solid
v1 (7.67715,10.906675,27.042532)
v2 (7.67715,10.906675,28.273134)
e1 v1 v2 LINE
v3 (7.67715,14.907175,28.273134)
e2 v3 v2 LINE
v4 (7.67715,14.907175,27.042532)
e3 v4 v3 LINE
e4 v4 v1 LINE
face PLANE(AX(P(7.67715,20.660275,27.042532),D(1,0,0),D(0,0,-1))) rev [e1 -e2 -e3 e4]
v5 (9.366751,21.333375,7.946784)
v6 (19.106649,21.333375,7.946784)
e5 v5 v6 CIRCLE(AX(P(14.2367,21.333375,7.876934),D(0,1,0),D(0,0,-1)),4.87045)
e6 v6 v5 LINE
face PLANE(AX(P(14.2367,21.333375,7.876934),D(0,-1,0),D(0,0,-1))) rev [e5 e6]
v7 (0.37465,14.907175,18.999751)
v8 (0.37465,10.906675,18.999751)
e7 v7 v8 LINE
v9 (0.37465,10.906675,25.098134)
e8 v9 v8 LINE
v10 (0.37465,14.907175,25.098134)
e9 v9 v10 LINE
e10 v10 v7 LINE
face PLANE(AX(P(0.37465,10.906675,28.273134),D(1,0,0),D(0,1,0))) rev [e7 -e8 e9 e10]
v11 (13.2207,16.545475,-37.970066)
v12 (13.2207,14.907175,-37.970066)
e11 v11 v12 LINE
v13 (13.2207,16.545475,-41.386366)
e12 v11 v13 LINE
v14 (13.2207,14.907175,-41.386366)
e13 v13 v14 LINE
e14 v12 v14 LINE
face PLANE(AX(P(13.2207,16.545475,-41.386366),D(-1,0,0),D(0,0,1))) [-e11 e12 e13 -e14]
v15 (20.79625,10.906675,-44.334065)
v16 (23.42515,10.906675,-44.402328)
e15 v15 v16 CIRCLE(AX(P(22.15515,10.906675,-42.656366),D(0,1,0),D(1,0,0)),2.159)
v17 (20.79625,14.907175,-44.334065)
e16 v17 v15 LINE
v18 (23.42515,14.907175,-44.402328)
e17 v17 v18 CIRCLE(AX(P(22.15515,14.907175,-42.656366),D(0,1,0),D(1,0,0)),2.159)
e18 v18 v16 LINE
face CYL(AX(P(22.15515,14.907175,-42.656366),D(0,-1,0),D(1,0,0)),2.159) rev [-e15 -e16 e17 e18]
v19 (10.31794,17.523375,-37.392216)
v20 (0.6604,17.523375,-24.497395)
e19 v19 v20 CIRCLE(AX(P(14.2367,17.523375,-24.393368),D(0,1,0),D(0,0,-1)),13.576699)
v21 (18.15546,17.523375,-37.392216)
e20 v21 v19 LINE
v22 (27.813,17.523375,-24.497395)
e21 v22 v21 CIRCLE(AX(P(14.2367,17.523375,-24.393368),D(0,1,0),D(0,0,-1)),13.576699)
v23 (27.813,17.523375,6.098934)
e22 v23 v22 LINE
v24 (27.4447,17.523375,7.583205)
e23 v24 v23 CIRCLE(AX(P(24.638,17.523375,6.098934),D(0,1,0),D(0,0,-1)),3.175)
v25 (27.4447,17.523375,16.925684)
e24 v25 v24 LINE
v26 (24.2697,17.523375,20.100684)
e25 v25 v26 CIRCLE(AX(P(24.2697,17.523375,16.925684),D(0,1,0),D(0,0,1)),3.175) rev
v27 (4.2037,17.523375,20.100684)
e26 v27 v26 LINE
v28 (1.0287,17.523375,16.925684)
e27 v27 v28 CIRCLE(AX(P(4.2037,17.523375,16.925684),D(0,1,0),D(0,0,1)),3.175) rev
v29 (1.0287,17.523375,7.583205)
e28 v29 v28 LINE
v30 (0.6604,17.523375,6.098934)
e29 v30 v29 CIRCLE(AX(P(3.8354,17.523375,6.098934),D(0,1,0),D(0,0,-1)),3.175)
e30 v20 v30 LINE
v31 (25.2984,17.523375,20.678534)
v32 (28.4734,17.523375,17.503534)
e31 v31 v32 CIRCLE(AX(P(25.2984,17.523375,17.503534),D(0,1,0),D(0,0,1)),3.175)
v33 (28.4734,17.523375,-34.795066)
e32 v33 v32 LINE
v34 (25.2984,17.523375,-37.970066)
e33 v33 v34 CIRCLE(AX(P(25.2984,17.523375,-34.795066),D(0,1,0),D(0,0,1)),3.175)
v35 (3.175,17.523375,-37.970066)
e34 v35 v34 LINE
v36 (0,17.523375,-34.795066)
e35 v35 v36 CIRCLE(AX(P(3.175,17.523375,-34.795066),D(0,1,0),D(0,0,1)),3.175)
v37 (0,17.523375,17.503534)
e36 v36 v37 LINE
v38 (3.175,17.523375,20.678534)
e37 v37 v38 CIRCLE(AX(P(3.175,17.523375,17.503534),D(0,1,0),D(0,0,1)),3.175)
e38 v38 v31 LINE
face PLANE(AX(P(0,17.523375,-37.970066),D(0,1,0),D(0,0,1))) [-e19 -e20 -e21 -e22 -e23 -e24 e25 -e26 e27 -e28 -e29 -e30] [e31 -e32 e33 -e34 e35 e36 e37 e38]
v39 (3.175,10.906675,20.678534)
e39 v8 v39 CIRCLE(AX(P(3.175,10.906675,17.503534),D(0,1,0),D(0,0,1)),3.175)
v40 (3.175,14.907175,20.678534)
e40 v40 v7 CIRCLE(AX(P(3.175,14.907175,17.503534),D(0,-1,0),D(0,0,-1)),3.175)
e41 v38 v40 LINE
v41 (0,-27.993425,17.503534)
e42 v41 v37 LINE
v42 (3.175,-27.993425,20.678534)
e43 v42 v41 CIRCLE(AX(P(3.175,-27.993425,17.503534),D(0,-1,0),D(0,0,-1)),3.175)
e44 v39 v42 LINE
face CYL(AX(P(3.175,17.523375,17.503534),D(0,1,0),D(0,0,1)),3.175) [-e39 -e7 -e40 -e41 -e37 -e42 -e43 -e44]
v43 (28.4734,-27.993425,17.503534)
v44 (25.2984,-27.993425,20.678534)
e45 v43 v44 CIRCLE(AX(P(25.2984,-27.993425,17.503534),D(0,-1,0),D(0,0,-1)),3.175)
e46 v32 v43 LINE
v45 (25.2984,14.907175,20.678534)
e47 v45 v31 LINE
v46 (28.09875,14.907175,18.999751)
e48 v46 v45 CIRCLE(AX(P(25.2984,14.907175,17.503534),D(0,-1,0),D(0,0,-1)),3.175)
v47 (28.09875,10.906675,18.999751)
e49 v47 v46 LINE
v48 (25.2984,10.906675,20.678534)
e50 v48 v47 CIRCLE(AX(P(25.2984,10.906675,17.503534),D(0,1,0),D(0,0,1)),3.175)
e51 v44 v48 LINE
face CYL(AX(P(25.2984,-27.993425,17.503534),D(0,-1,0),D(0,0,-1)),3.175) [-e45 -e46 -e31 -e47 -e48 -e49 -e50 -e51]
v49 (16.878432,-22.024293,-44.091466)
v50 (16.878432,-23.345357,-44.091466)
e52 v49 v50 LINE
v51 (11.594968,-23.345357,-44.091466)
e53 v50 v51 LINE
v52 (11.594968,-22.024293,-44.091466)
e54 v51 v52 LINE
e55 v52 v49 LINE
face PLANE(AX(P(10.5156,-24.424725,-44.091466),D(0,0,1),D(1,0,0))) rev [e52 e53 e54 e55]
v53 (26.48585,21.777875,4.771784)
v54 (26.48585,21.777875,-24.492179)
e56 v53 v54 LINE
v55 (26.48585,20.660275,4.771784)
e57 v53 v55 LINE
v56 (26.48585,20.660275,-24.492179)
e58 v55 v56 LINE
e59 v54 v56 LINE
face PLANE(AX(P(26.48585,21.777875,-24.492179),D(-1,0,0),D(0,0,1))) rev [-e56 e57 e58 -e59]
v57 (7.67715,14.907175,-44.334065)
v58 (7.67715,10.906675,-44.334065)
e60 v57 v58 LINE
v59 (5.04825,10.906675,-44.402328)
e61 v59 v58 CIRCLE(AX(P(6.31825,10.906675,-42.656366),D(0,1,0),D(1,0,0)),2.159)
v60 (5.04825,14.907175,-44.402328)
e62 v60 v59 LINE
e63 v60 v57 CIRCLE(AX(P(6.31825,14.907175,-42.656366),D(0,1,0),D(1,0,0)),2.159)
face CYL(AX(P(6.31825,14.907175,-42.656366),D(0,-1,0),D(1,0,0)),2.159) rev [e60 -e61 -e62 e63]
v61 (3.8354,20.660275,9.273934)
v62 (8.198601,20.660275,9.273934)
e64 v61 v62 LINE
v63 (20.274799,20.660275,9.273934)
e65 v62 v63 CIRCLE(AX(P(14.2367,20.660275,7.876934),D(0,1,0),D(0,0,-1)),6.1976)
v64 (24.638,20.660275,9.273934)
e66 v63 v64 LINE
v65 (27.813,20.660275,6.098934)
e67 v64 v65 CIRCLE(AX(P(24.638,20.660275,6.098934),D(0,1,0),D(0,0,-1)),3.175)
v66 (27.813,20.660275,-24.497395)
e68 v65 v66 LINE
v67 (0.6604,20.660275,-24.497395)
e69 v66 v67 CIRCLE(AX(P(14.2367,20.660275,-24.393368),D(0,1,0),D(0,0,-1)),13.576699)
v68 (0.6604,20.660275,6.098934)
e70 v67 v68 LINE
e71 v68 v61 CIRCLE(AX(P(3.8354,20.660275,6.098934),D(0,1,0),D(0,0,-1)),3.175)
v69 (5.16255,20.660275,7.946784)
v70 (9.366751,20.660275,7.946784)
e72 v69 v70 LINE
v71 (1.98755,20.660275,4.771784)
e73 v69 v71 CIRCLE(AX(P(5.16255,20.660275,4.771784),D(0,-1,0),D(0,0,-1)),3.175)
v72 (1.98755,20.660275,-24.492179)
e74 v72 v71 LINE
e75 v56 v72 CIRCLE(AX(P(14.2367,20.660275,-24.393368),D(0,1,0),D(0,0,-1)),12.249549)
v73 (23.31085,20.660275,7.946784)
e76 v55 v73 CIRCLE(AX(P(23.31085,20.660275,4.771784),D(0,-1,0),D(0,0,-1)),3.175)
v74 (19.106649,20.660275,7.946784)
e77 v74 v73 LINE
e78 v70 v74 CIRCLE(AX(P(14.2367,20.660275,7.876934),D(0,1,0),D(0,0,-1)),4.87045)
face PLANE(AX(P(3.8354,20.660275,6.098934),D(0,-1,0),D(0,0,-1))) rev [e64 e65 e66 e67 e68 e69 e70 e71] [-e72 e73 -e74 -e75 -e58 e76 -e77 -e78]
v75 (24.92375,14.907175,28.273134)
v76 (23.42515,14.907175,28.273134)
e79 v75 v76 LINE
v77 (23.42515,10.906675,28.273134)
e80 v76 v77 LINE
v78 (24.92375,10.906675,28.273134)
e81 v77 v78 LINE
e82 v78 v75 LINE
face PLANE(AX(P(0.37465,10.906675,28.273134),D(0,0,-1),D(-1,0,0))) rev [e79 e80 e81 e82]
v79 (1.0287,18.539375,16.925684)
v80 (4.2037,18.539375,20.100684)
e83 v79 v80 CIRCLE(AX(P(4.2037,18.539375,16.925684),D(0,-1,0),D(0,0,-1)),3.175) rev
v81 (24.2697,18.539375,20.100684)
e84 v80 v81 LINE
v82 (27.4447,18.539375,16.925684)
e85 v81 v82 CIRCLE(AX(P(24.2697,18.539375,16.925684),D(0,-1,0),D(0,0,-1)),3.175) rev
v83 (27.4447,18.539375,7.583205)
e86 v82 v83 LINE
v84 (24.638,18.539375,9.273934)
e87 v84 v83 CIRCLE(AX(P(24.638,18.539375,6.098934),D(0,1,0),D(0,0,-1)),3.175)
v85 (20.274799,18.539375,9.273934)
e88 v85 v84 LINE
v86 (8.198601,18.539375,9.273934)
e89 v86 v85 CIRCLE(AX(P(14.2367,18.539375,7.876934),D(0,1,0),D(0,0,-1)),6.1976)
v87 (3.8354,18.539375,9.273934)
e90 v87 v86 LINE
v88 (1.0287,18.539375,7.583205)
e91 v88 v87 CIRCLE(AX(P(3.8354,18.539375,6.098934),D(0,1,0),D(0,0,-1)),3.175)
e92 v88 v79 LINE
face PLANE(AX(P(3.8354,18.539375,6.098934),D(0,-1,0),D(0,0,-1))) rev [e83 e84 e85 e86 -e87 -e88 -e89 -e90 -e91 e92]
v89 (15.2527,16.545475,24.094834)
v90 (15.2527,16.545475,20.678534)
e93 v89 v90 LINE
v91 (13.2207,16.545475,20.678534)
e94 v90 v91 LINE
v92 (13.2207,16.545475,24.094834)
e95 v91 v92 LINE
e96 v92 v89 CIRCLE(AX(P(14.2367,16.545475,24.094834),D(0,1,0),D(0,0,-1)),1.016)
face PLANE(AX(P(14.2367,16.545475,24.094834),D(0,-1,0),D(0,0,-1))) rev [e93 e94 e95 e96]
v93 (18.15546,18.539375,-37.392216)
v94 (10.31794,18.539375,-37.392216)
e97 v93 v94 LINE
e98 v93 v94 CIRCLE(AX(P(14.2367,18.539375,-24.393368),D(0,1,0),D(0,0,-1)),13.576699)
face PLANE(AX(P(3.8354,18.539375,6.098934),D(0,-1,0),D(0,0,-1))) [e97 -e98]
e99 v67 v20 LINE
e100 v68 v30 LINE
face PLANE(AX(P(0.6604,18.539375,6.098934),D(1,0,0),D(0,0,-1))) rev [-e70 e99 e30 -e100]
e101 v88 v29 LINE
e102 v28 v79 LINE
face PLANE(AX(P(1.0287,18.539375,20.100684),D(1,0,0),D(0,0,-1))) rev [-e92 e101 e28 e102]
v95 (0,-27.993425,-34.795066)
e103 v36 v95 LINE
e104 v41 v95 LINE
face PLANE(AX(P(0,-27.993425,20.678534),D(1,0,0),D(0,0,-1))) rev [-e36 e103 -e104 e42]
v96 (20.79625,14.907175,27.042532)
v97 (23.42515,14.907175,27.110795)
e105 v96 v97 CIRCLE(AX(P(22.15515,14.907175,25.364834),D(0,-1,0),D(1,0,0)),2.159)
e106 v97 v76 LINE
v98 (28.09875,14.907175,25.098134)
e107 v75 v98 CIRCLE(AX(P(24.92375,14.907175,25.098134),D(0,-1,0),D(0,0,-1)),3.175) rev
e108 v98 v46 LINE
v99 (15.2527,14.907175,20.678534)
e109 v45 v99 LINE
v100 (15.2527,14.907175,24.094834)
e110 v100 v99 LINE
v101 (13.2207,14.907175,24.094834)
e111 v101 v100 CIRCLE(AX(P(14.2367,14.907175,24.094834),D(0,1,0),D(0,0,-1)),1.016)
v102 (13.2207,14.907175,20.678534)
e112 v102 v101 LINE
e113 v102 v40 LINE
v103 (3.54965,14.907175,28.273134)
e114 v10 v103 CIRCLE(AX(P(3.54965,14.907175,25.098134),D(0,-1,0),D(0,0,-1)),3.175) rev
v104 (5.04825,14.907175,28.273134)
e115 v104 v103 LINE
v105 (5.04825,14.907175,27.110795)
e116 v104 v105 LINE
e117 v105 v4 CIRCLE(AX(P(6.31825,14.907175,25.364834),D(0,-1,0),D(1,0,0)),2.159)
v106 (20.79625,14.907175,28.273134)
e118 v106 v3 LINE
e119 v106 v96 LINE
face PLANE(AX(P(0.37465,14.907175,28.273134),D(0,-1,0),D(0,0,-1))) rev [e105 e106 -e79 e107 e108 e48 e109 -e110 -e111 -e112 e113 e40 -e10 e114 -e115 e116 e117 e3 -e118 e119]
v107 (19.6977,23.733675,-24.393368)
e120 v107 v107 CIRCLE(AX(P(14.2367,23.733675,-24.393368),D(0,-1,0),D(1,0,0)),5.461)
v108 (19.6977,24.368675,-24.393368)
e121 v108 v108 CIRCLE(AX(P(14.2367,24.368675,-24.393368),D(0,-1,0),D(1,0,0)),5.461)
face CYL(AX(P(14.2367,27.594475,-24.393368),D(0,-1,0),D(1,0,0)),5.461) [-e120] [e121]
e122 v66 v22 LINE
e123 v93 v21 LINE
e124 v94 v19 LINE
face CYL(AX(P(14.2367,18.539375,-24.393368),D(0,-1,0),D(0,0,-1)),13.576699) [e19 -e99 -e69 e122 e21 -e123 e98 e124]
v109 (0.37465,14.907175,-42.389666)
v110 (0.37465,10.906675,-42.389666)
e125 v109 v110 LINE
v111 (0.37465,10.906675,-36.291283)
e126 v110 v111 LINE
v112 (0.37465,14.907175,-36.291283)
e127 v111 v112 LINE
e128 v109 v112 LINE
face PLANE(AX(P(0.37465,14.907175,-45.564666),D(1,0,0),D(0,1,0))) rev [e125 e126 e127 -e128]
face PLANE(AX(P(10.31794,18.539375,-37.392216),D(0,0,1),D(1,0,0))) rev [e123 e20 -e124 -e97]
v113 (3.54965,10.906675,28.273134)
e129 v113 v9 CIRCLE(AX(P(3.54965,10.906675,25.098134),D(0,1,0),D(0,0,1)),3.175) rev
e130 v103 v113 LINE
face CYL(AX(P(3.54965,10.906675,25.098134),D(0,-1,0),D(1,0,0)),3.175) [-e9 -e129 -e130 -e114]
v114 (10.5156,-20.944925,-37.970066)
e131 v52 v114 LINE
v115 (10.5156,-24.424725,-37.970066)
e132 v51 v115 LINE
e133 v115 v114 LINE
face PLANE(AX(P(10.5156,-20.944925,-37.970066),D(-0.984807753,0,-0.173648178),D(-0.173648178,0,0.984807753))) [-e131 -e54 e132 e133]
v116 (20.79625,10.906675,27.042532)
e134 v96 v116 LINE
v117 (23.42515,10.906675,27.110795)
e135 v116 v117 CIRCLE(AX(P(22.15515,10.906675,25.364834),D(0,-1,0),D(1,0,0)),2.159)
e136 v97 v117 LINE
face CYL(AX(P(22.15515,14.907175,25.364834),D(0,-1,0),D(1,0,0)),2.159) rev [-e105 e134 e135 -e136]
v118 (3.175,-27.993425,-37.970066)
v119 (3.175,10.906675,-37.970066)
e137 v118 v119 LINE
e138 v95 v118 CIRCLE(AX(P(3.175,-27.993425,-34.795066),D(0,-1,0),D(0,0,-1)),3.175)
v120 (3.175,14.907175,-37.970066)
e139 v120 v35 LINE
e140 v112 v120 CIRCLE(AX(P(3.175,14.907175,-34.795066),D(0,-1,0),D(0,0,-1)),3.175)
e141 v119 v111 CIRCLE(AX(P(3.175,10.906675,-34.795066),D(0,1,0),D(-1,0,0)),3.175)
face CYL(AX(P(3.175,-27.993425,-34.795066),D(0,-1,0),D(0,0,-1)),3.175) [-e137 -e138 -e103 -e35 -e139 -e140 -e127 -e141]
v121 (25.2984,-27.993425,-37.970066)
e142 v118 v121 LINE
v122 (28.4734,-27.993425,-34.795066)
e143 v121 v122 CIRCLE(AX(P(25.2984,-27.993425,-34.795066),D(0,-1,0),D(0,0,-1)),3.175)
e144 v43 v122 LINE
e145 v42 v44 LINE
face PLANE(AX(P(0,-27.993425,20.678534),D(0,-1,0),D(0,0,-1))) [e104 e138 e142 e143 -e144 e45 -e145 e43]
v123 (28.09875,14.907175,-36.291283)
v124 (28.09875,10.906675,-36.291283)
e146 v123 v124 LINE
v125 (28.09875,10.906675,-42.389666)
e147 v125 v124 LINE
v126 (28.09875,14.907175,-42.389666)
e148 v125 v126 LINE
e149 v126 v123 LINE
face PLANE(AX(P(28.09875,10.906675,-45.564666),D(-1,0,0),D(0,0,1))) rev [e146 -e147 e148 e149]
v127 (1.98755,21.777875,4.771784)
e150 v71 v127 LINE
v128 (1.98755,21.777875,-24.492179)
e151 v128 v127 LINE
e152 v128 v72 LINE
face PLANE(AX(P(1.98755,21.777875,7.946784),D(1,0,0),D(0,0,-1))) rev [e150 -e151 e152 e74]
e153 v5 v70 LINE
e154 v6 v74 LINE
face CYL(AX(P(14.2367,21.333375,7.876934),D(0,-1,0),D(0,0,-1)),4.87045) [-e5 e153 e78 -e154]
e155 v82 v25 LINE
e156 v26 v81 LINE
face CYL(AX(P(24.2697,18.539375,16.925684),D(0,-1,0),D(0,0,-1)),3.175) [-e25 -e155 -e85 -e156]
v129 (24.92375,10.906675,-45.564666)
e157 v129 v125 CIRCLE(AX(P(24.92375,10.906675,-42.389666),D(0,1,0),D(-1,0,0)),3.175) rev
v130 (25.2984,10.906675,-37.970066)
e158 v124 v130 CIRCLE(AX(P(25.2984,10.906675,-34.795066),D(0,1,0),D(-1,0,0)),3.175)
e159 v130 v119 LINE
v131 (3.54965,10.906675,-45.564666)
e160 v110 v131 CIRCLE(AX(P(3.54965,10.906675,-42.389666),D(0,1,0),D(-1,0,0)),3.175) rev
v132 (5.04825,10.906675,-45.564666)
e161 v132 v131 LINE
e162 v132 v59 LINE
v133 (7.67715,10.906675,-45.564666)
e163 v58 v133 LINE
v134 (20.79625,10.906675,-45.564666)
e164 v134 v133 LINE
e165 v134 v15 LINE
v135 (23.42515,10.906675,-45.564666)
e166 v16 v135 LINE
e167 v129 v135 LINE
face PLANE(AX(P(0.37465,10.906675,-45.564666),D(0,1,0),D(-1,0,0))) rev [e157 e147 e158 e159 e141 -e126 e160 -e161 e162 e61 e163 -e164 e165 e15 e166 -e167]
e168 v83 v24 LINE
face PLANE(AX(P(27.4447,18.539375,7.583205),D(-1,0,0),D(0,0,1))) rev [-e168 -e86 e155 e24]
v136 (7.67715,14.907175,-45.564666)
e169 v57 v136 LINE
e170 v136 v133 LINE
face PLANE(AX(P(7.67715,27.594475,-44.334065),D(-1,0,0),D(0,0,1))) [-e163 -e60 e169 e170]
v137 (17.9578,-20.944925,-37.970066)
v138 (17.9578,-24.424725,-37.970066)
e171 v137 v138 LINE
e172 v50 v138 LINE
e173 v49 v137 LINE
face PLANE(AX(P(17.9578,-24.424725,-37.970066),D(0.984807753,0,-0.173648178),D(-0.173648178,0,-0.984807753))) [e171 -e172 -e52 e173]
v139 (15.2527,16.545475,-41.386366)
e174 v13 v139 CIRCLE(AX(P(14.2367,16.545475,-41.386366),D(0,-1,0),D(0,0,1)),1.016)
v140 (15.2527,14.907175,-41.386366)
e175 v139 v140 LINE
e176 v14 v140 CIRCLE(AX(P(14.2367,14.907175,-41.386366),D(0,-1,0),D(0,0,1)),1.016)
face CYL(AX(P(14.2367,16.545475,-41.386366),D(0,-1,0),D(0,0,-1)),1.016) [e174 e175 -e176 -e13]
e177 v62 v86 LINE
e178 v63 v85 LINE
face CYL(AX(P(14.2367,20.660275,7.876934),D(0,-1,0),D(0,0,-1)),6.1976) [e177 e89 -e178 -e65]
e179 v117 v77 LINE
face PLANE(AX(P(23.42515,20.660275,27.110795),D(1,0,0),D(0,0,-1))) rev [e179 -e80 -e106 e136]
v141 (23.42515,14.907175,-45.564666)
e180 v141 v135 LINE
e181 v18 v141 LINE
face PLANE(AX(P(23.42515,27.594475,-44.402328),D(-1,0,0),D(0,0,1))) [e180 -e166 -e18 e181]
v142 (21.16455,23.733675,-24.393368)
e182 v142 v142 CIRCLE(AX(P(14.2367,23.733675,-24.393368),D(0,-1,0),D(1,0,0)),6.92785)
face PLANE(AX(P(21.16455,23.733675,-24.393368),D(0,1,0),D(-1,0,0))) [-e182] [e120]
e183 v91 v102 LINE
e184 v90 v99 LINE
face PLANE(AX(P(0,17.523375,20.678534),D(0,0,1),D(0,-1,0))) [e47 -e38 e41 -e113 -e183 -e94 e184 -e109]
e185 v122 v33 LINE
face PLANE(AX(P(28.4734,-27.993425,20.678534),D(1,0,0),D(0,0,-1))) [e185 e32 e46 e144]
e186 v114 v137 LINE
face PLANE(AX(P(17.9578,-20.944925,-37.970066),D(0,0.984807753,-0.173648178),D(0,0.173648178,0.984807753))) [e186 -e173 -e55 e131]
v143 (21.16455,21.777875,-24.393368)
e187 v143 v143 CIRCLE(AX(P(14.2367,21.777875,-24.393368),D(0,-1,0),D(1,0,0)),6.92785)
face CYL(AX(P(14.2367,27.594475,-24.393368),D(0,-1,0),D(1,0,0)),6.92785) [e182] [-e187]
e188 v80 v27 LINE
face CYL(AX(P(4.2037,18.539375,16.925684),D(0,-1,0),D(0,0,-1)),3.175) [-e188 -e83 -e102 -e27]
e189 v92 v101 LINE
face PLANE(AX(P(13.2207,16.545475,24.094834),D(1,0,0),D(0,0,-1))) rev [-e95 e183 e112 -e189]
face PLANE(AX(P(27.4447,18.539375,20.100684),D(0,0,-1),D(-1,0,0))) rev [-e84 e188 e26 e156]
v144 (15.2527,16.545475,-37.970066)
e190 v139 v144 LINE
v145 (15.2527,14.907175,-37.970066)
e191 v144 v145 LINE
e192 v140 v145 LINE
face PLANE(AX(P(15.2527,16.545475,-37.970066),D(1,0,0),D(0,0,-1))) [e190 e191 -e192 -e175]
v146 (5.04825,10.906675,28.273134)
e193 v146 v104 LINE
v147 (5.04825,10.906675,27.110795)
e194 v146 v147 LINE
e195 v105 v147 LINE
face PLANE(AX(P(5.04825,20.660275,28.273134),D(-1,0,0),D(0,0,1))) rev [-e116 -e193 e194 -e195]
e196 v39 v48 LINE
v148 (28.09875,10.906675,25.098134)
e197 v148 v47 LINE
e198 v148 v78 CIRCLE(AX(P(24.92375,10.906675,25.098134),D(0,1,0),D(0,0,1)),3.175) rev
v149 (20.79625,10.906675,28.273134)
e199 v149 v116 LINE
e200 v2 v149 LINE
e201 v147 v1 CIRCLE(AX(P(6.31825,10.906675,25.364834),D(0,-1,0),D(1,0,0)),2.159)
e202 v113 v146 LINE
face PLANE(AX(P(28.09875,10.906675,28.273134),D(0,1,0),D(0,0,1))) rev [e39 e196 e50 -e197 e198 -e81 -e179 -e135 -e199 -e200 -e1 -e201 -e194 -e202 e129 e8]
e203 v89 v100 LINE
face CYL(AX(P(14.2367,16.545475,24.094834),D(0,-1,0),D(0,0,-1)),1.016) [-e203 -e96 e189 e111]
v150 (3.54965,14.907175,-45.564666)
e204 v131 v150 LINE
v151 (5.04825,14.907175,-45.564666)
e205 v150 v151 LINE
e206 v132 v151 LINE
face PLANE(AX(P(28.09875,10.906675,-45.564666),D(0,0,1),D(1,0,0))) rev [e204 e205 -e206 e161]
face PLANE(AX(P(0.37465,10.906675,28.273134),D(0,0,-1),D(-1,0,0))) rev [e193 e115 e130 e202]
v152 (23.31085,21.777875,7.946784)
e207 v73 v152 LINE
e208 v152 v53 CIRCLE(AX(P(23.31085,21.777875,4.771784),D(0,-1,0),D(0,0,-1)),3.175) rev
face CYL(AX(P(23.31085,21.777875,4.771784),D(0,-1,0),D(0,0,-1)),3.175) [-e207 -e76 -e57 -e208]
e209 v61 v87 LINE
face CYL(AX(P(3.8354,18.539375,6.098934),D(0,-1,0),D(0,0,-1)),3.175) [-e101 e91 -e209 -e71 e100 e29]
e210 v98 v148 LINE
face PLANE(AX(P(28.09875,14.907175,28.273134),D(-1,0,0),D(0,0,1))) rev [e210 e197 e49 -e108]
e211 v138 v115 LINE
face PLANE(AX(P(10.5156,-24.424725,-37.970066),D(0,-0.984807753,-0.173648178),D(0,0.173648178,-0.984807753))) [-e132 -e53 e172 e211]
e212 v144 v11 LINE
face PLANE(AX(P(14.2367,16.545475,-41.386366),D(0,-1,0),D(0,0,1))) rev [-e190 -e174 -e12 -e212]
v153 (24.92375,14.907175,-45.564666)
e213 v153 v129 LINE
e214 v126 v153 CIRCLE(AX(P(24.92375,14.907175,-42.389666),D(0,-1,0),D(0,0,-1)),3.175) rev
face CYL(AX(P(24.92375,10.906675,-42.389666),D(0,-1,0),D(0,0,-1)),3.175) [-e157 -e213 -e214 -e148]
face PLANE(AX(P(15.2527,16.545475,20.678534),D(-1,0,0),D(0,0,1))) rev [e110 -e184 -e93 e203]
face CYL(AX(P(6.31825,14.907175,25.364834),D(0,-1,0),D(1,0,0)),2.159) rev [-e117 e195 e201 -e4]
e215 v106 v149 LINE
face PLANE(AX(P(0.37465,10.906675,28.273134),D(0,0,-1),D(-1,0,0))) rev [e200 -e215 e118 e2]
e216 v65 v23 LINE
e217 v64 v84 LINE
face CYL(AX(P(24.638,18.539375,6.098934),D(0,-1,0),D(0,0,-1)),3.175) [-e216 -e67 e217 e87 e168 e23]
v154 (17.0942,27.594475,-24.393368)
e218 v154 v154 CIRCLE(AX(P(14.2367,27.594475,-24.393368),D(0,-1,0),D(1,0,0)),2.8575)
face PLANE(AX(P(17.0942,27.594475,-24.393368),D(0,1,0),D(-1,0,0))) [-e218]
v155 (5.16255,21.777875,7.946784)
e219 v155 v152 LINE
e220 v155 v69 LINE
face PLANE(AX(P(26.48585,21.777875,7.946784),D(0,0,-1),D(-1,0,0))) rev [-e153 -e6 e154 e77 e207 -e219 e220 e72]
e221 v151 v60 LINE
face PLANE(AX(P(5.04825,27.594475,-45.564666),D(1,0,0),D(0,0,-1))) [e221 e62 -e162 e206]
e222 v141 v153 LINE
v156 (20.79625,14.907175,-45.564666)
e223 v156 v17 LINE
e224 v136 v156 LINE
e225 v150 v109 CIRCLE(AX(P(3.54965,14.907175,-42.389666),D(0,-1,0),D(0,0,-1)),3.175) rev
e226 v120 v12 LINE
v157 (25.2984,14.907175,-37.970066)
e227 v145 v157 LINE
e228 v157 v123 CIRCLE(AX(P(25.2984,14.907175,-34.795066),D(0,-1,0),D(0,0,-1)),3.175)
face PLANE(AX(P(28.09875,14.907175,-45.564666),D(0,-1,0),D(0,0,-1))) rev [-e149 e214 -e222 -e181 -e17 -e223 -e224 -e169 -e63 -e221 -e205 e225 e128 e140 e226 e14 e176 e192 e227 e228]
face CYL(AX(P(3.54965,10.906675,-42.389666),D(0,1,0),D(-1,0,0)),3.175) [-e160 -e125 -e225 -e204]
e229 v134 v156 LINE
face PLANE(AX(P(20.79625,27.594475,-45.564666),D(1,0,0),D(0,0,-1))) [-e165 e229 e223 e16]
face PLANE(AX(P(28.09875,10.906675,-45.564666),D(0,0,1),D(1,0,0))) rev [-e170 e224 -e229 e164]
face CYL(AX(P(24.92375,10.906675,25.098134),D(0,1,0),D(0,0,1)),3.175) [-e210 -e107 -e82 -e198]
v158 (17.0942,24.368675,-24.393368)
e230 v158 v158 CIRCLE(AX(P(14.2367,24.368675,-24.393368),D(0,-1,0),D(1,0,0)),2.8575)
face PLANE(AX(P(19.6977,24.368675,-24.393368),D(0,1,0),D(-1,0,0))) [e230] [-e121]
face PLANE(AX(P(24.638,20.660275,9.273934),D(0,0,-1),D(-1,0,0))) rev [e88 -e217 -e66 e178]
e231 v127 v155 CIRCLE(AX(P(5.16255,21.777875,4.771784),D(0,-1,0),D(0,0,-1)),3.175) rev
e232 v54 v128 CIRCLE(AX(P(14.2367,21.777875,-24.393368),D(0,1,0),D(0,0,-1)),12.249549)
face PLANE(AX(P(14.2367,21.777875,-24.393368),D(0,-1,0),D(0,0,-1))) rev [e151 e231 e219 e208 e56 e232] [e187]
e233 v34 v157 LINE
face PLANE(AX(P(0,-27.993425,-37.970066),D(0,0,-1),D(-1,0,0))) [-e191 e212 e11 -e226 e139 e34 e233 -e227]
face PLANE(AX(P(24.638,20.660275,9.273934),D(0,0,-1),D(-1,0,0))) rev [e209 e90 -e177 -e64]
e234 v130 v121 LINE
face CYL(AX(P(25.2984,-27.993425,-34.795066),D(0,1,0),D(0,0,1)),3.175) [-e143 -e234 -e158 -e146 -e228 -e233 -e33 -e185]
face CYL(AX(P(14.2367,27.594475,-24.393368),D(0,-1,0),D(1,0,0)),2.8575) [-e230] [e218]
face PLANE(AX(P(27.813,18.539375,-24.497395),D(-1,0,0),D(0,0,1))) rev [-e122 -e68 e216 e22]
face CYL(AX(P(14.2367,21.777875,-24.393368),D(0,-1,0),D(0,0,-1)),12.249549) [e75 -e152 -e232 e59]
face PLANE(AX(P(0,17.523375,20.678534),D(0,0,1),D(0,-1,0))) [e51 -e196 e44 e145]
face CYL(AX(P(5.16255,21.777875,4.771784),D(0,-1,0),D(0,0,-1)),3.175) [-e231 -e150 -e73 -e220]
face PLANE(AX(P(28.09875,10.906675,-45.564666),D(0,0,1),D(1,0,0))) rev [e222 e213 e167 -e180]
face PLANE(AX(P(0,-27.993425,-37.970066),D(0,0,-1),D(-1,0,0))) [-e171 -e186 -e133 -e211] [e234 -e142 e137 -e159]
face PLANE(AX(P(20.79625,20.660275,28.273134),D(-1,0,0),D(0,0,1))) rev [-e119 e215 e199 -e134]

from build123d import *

# Parameters (mm, degrees)
SKETCH1_W            = 58.6486
SKETCH1_H            = 45.5168
BOSS_EXTRUDE1_DEPTH  = 28.4734
BOSS_EXTRUDE2_DEPTH  = 1.016
BOSS_EXTRUDE3_DEPTH  = 2.1209
SKETCH4_W            = 27.7241
SKETCH4_H            = 4.0005
BOSS_EXTRUDE4_DEPTH  = 7.5946
CUT_EXTRUDE1_DEPTH   = 62.365122174
CUT_EXTRUDE2_DEPTH   = 62.365122174
BOSS_EXTRUDE5_DEPTH  = 2.1209
BOSS_EXTRUDE6_DEPTH  = 1.6383
BOSS_EXTRUDE7_DEPTH  = 1.1176
BOSS_EXTRUDE8_DEPTH  = 0.6731
SKETCH11_W           = 7.4422
SKETCH11_H           = 3.4798
BOSS_EXTRUDE9_DEPTH  = 6.1214
BOSS_EXTRUDE9_TAPER  = 10
SKETCH12_W           = 27.7241
SKETCH12_H           = 4.0005
BOSS_EXTRUDE10_DEPTH = 7.5946
SKETCH13_W           = 2.159
SKETCH13_H           = 4.0005
SKETCH14_W           = 2.159
SKETCH14_H           = 4.0005
FILLET1_R            = 3.175
FILLET2_R            = 3.175
FILLET3_R            = 3.175
FILLET4_R            = 3.175
FILLET5_R            = 3.175
FILLET6_R            = 3.175
FILLET7_R            = 3.175
FILLET8_R            = 3.175
FILLET9_R            = 3.175
FILLET10_R           = 3.175
FILLET11_R           = 3.175
FILLET12_R           = 3.175


with BuildPart() as part:
    # Sketch1 → Boss-Extrude1 (new body)
    with BuildSketch(Plane(origin=(28.4734, 0, 0), x_dir=(0, 0, -1), z_dir=(1, 0, 0))):
        with Locations((8.645766261, -5.235024912)):
            Rectangle(SKETCH1_W, SKETCH1_H)
    extrude(amount=-BOSS_EXTRUDE1_DEPTH)

    # Sketch2 → Boss-Extrude2 (add)
    with BuildSketch(Plane(origin=(0, 17.523375088, 0), x_dir=(-1, 0, 0), z_dir=(0, 1, 0))):
        with BuildLine():
            Line((-27.4447, 20.100683739), (-1.0287, 20.100683739))
            Line((-1.0287, 20.100683739), (-1.0287, 7.58320464))
            ThreePointArc((-1.0287, 7.58320464), (-0.753850268, 6.863574994), (-0.6604, 6.098933739))
            Line((-0.6604, 6.098933739), (-0.6604, -24.497394688))
            ThreePointArc((-0.6604, -24.497394688), (-3.369851934, -32.532062726), (-10.317940007, -37.392216261))
            Line((-10.317940007, -37.392216261), (-18.155459993, -37.392216261))
            ThreePointArc((-18.155459993, -37.392216261), (-25.103548066, -32.532062726), (-27.813, -24.497394688))
            Line((-27.813, -24.497394688), (-27.813, 6.098933739))
            ThreePointArc((-27.813, 6.098933739), (-27.719549732, 6.863574994), (-27.4447, 7.58320464))
            Line((-27.4447, 7.58320464), (-27.4447, 20.100683739))
        make_face()
    extrude(amount=BOSS_EXTRUDE2_DEPTH)

    # Sketch3 → Boss-Extrude3 (add)
    with BuildSketch(Plane(origin=(0, 18.539375088, 0), x_dir=(-1, 0, 0), z_dir=(0, 1, 0))):
        with BuildLine():
            Line((-0.6604, 6.098933739), (-0.6604, -24.497394688))
            ThreePointArc((-0.6604, -24.497394688), (-14.2367, -37.970066261), (-27.813, -24.497394688))
            Line((-27.813, -24.497394688), (-27.813, 6.098933739))
            ThreePointArc((-27.813, 6.098933739), (-26.88306403, 8.343997769), (-24.638, 9.273933739))
            Line((-24.638, 9.273933739), (-3.8354, 9.273933739))
            ThreePointArc((-3.8354, 9.273933739), (-1.59033597, 8.343997769), (-0.6604, 6.098933739))
        make_face()
    extrude(amount=BOSS_EXTRUDE3_DEPTH)

    # Sketch4 → Boss-Extrude4 (add)
    with BuildSketch(Plane.XY.offset(20.678533739)):
        with Locations((14.2367, 12.906925088)):
            Rectangle(SKETCH4_W, SKETCH4_H)
    extrude(amount=BOSS_EXTRUDE4_DEPTH)

    # Sketch5 → Cut-Extrude1 (cut, through all)
    with BuildSketch(Plane.XZ.offset(-10.906675088)):
        with BuildLine():
            Line((7.67715, 28.273133739), (5.04825, 28.273133739))
            Line((5.04825, 28.273133739), (5.04825, 27.110795078))
            ThreePointArc((5.04825, 27.110795078), (6.374292493, 27.523106251), (7.67715, 27.042532099))
            Line((7.67715, 27.042532099), (7.67715, 28.273133739))
        make_face()
    cut_extrude1 = extrude(amount=-CUT_EXTRUDE1_DEPTH, mode=Mode.SUBTRACT)

    # Sketch6 → Cut-Extrude2 (cut, through all)
    with BuildSketch(Plane.XZ.offset(-10.906675088)):
        with BuildLine():
            Line((23.42515, 28.273133739), (20.79625, 28.273133739))
            Line((20.79625, 28.273133739), (20.79625, 27.042532099))
            ThreePointArc((20.79625, 27.042532099), (22.099107507, 27.523106251), (23.42515, 27.110795078))
            Line((23.42515, 27.110795078), (23.42515, 28.273133739))
        make_face()
    cut_extrude2 = extrude(amount=-CUT_EXTRUDE2_DEPTH, mode=Mode.SUBTRACT)

    # Sketch7 → Boss-Extrude5 (add)
    with BuildSketch(Plane(origin=(0, 18.539375088, 0), x_dir=(-1, 0, 0), z_dir=(0, 1, 0))):
        with BuildLine():
            Line((-8.19860123, 9.273933739), (-20.27479877, 9.273933739))
            ThreePointArc((-20.27479877, 9.273933739), (-14.2367, 14.074533739), (-8.19860123, 9.273933739))
        make_face()
    extrude(amount=BOSS_EXTRUDE5_DEPTH)

    # Sketch8 → Boss-Extrude6 (add)
    with BuildSketch(Plane(origin=(0, 14.907175088, 0), x_dir=(-1, 0, 0), z_dir=(0, 1, 0))):
        with BuildLine():
            Line((-13.2207, 24.094833739), (-13.2207, 20.678533739))
            Line((-13.2207, 20.678533739), (-15.2527, 20.678533739))
            Line((-15.2527, 20.678533739), (-15.2527, 24.094833739))
            ThreePointArc((-15.2527, 24.094833739), (-14.2367, 25.110833739), (-13.2207, 24.094833739))
        make_face()
    boss_extrude6 = extrude(amount=BOSS_EXTRUDE6_DEPTH)

    # Sketch9 → Boss-Extrude7 (add)
    with BuildSketch(Plane(origin=(0, 20.660275088, 0), x_dir=(-1, 0, 0), z_dir=(0, 1, 0))):
        with BuildLine():
            Line((-26.48585, -24.492179461), (-26.48585, 7.946783739))
            Line((-26.48585, 7.946783739), (-1.98755, 7.946783739))
            Line((-1.98755, 7.946783739), (-1.98755, -24.492179461))
            ThreePointArc((-1.98755, -24.492179461), (-14.2367, -36.642916261), (-26.48585, -24.492179461))
        make_face()
    extrude(amount=BOSS_EXTRUDE7_DEPTH)

    # Sketch10 → Boss-Extrude8 (add)
    with BuildSketch(Plane(origin=(0, 20.660275088, 0), x_dir=(-1, 0, 0), z_dir=(0, 1, 0))):
        with BuildLine():
            Line((-9.366750906, 7.946783739), (-19.106649094, 7.946783739))
            ThreePointArc((-19.106649094, 7.946783739), (-14.2367, 12.747383739), (-9.366750906, 7.946783739))
        make_face()
    extrude(amount=BOSS_EXTRUDE8_DEPTH)

    # Sketch11 → Boss-Extrude9 (add)
    with BuildSketch(Plane(origin=(0, 0, -37.970066261), x_dir=(-1, 0, 0), z_dir=(0, 0, -1))):
        with Locations((-14.2367, -22.684824912)):
            Rectangle(SKETCH11_W, SKETCH11_H)
    extrude(amount=BOSS_EXTRUDE9_DEPTH, taper=BOSS_EXTRUDE9_TAPER)

    # Sketch12 → Boss-Extrude10 (add)
    with BuildSketch(Plane(origin=(0, 0, -37.970066261), x_dir=(-1, 0, 0), z_dir=(0, 0, -1))):
        with Locations((-14.2367, 12.906925088)):
            Rectangle(SKETCH12_W, SKETCH12_H)
    extrude(amount=BOSS_EXTRUDE10_DEPTH)

    # Sketch13 → Cut-Revolve1 (revolve, cut)
    with BuildSketch(Plane.XY.offset(25.364833739)):
        with Locations((7.39775, 12.906925088)):
            Rectangle(SKETCH13_W, SKETCH13_H)
    cut_revolve1 = revolve(axis=Axis((6.31825, 14.907175088, 25.364833739), (0, -1, 0)), mode=Mode.SUBTRACT)

    # Sketch14 → Cut-Revolve2 (revolve, cut)
    with BuildSketch(Plane.XY.offset(25.364833739)):
        with Locations((23.23465, 12.906925088)):
            Rectangle(SKETCH14_W, SKETCH14_H)
    cut_revolve2 = revolve(axis=Axis((22.15515, 14.907175088, 25.364833739), (0, -1, 0)), mode=Mode.SUBTRACT)

    # Sketch15 → Revolve1 (revolve)
    with BuildSketch(Plane.XY.offset(-24.393367719)):
        Polygon((17.0942, 27.594475088), (14.2367, 27.594475088), (14.2367, 21.777875088), (21.16455, 21.777875088), (21.16455, 23.733675088), (19.6977, 23.733675088), (19.6977, 24.368675088), (17.0942, 24.368675088), align=None)
    revolve(axis=Axis((14.2367, 27.594475088, -24.393367719), (0, -1, 0)))

    # Fillet1
    fillet1_edges = [part.edges().sort_by_distance(p)[0] for p in [
        (27.4447, 18.031375088, 20.100683739),
    ]]
    fillet(fillet1_edges, radius=FILLET1_R)

    # Fillet2
    fillet2_edges = [part.edges().sort_by_distance(p)[0] for p in [
        (1.0287, 18.031375088, 20.100683739),
    ]]
    fillet(fillet2_edges, radius=FILLET2_R)

    # Fillet3
    # the kernel refuses this fillet: 3.175 mm, written as the material it takes off along each edge
    with BuildSketch(Plane(origin=(0, -35.930924912, -37.970066261), x_dir=(1, 0, 0), z_dir=(0, 1, 0))) as fillet3_piece_1_section:
        with BuildLine():
            CenterArc((FILLET3_R, -FILLET3_R), FILLET3_R, 90, 90)
            Line((0, -FILLET3_R), (0, 0))
            Line((0, 0), (FILLET3_R, 0))
        make_face()
    fillet3_piece_1 = extrude(amount=61.3918, mode=Mode.PRIVATE)
    fillet3_piece_1 = split(fillet3_piece_1, bisect_by=Plane(origin=(1.118801035, 10.906675088, -37.559986199), z_dir=(0, -1, 0)), keep=Keep.TOP, mode=Mode.PRIVATE)
    fillet3_piece_1 = split(fillet3_piece_1, bisect_by=Plane(origin=(0.37465, -12.512124912, -37.559986199), z_dir=(1, 0, 0)), keep=Keep.TOP, mode=Mode.PRIVATE)
    add(fillet3_piece_1, mode=Mode.SUBTRACT)
    with BuildSketch(Plane(origin=(0, -35.930924912, -37.970066261), x_dir=(1, 0, 0), z_dir=(0, 1, 0))) as fillet3_piece_2_section:
        with BuildLine():
            CenterArc((FILLET3_R, -FILLET3_R), FILLET3_R, 90, 90)
            Line((0, -FILLET3_R), (0, 0))
            Line((0, 0), (FILLET3_R, 0))
        make_face()
    fillet3_piece_2 = extrude(amount=61.3918, mode=Mode.PRIVATE)
    fillet3_piece_2 = split(fillet3_piece_2, bisect_by=Plane(origin=(0.130694491, 10.906675088, -36.797348053), z_dir=(0, -1, 0)), keep=Keep.TOP, mode=Mode.PRIVATE)
    fillet3_piece_2 = split(fillet3_piece_2, bisect_by=Plane(origin=(0.37465, -12.512124912, -36.797348053), z_dir=(-1, 0, 0)), keep=Keep.TOP, mode=Mode.PRIVATE)
    add(fillet3_piece_2, mode=Mode.SUBTRACT)
    with BuildSketch(Plane(origin=(0, -35.930924912, -37.970066261), x_dir=(1, 0, 0), z_dir=(0, 1, 0))) as fillet3_piece_3_section:
        with BuildLine():
            CenterArc((FILLET3_R, -FILLET3_R), FILLET3_R, 90, 90)
            Line((0, -FILLET3_R), (0, 0))
            Line((0, 0), (FILLET3_R, 0))
        make_face()
    fillet3_piece_3 = extrude(amount=61.3918, mode=Mode.PRIVATE)
    fillet3_piece_3 = split(fillet3_piece_3, bisect_by=Plane(origin=(0.130694491, 10.906675088, -36.797348053), z_dir=(0, 1, 0)), keep=Keep.TOP, mode=Mode.PRIVATE)
    fillet3_piece_3 = split(fillet3_piece_3, bisect_by=Plane(origin=(0.37465, 12.906925088, -36.797348053), z_dir=(-1, 0, 0)), keep=Keep.TOP, mode=Mode.PRIVATE)
    fillet3_piece_3 = split(fillet3_piece_3, bisect_by=Plane(origin=(0.130694491, 14.907175088, -36.797348053), z_dir=(0, -1, 0)), keep=Keep.TOP, mode=Mode.PRIVATE)
    add(fillet3_piece_3, mode=Mode.SUBTRACT)
    with BuildSketch(Plane(origin=(0, -35.930924912, -37.970066261), x_dir=(1, 0, 0), z_dir=(0, 1, 0))) as fillet3_piece_4_section:
        with BuildLine():
            CenterArc((FILLET3_R, -FILLET3_R), FILLET3_R, 90, 90)
            Line((0, -FILLET3_R), (0, 0))
            Line((0, 0), (FILLET3_R, 0))
        make_face()
    fillet3_piece_4 = extrude(amount=61.3918, mode=Mode.PRIVATE)
    fillet3_piece_4 = split(fillet3_piece_4, bisect_by=Plane(origin=(0.37465, 20.184025088, -37.559986199), z_dir=(1, 0, 0)), keep=Keep.TOP, mode=Mode.PRIVATE)
    fillet3_piece_4 = split(fillet3_piece_4, bisect_by=Plane(origin=(1.118801035, 14.907175088, -37.559986199), z_dir=(0, 1, 0)), keep=Keep.TOP, mode=Mode.PRIVATE)
    add(fillet3_piece_4, mode=Mode.SUBTRACT)
    with BuildSketch(Plane(origin=(0, -35.930924912, -37.970066261), x_dir=(1, 0, 0), z_dir=(0, 1, 0))) as fillet3_piece_5_section:
        with BuildLine():
            CenterArc((FILLET3_R, -FILLET3_R), FILLET3_R, 90, 90)
            Line((0, -FILLET3_R), (0, 0))
            Line((0, 0), (FILLET3_R, 0))
        make_face()
    fillet3_piece_5 = extrude(amount=61.3918, mode=Mode.PRIVATE)
    fillet3_piece_5 = split(fillet3_piece_5, bisect_by=Plane(origin=(0.37465, 20.184025088, -36.797348053), z_dir=(-1, 0, 0)), keep=Keep.TOP, mode=Mode.PRIVATE)
    fillet3_piece_5 = split(fillet3_piece_5, bisect_by=Plane(origin=(0.130694491, 14.907175088, -36.797348053), z_dir=(0, 1, 0)), keep=Keep.TOP, mode=Mode.PRIVATE)
    add(fillet3_piece_5, mode=Mode.SUBTRACT)

    # Fillet4
    fillet4_edges = [part.edges().sort_by_distance(p)[0] for p in [
        (0.37465, 12.906925088, 28.273133739),
    ]]
    fillet(fillet4_edges, radius=FILLET4_R)

    # Fillet5
    # the kernel refuses this fillet: 3.175 mm, written as the material it takes off along each edge
    with BuildSketch(Plane(origin=(28.4734, -35.930924912, -37.970066261), x_dir=(0, 0, 1), z_dir=(0, 1, 0))) as fillet5_piece_1_section:
        with BuildLine():
            CenterArc((FILLET5_R, -FILLET5_R), FILLET5_R, 90, 90)
            Line((0, -FILLET5_R), (0, 0))
            Line((0, 0), (FILLET5_R, 0))
        make_face()
    fillet5_piece_1 = extrude(amount=61.3918, mode=Mode.PRIVATE)
    fillet5_piece_1 = split(fillet5_piece_1, bisect_by=Plane(origin=(28.09875, -12.512124912, -36.797348053), z_dir=(1, 0, 0)), keep=Keep.TOP, mode=Mode.PRIVATE)
    fillet5_piece_1 = split(fillet5_piece_1, bisect_by=Plane(origin=(28.342705509, 10.906675088, -36.797348053), z_dir=(0, -1, 0)), keep=Keep.TOP, mode=Mode.PRIVATE)
    add(fillet5_piece_1, mode=Mode.SUBTRACT)
    with BuildSketch(Plane(origin=(28.4734, -35.930924912, -37.970066261), x_dir=(0, 0, 1), z_dir=(0, 1, 0))) as fillet5_piece_2_section:
        with BuildLine():
            CenterArc((FILLET5_R, -FILLET5_R), FILLET5_R, 90, 90)
            Line((0, -FILLET5_R), (0, 0))
            Line((0, 0), (FILLET5_R, 0))
        make_face()
    fillet5_piece_2 = extrude(amount=61.3918, mode=Mode.PRIVATE)
    fillet5_piece_2 = split(fillet5_piece_2, bisect_by=Plane(origin=(28.09875, -12.512124912, -37.559986199), z_dir=(-1, 0, 0)), keep=Keep.TOP, mode=Mode.PRIVATE)
    fillet5_piece_2 = split(fillet5_piece_2, bisect_by=Plane(origin=(27.354598965, 10.906675088, -37.559986199), z_dir=(0, -1, 0)), keep=Keep.TOP, mode=Mode.PRIVATE)
    add(fillet5_piece_2, mode=Mode.SUBTRACT)
    with BuildSketch(Plane(origin=(28.4734, -35.930924912, -37.970066261), x_dir=(0, 0, 1), z_dir=(0, 1, 0))) as fillet5_piece_3_section:
        with BuildLine():
            CenterArc((FILLET5_R, -FILLET5_R), FILLET5_R, 90, 90)
            Line((0, -FILLET5_R), (0, 0))
            Line((0, 0), (FILLET5_R, 0))
        make_face()
    fillet5_piece_3 = extrude(amount=61.3918, mode=Mode.PRIVATE)
    fillet5_piece_3 = split(fillet5_piece_3, bisect_by=Plane(origin=(28.342705509, 14.907175088, -36.797348053), z_dir=(0, -1, 0)), keep=Keep.TOP, mode=Mode.PRIVATE)
    fillet5_piece_3 = split(fillet5_piece_3, bisect_by=Plane(origin=(28.09875, 12.906925088, -36.797348053), z_dir=(1, 0, 0)), keep=Keep.TOP, mode=Mode.PRIVATE)
    fillet5_piece_3 = split(fillet5_piece_3, bisect_by=Plane(origin=(28.342705509, 10.906675088, -36.797348053), z_dir=(0, 1, 0)), keep=Keep.TOP, mode=Mode.PRIVATE)
    add(fillet5_piece_3, mode=Mode.SUBTRACT)
    with BuildSketch(Plane(origin=(28.4734, -35.930924912, -37.970066261), x_dir=(0, 0, 1), z_dir=(0, 1, 0))) as fillet5_piece_4_section:
        with BuildLine():
            CenterArc((FILLET5_R, -FILLET5_R), FILLET5_R, 90, 90)
            Line((0, -FILLET5_R), (0, 0))
            Line((0, 0), (FILLET5_R, 0))
        make_face()
    fillet5_piece_4 = extrude(amount=61.3918, mode=Mode.PRIVATE)
    fillet5_piece_4 = split(fillet5_piece_4, bisect_by=Plane(origin=(28.342705509, 14.907175088, -36.797348053), z_dir=(0, 1, 0)), keep=Keep.TOP, mode=Mode.PRIVATE)
    fillet5_piece_4 = split(fillet5_piece_4, bisect_by=Plane(origin=(28.09875, 20.184025088, -36.797348053), z_dir=(1, 0, 0)), keep=Keep.TOP, mode=Mode.PRIVATE)
    add(fillet5_piece_4, mode=Mode.SUBTRACT)
    with BuildSketch(Plane(origin=(28.4734, -35.930924912, -37.970066261), x_dir=(0, 0, 1), z_dir=(0, 1, 0))) as fillet5_piece_5_section:
        with BuildLine():
            CenterArc((FILLET5_R, -FILLET5_R), FILLET5_R, 90, 90)
            Line((0, -FILLET5_R), (0, 0))
            Line((0, 0), (FILLET5_R, 0))
        make_face()
    fillet5_piece_5 = extrude(amount=61.3918, mode=Mode.PRIVATE)
    fillet5_piece_5 = split(fillet5_piece_5, bisect_by=Plane(origin=(27.354598965, 14.907175088, -37.559986199), z_dir=(0, 1, 0)), keep=Keep.TOP, mode=Mode.PRIVATE)
    fillet5_piece_5 = split(fillet5_piece_5, bisect_by=Plane(origin=(28.09875, 20.184025088, -37.559986199), z_dir=(-1, 0, 0)), keep=Keep.TOP, mode=Mode.PRIVATE)
    add(fillet5_piece_5, mode=Mode.SUBTRACT)

    # Fillet6
    fillet6_edges = [part.edges().sort_by_distance(p)[0] for p in [
        (1.98755, 21.219075088, 7.946783739),
    ]]
    fillet(fillet6_edges, radius=FILLET6_R)

    # Fillet7
    # the kernel refuses this fillet: 3.175 mm, written as the material it takes off along each edge
    with BuildSketch(Plane(origin=(28.4734, 25.460875088, 20.678533739), x_dir=(0, 0, -1), z_dir=(0, -1, 0))) as fillet7_piece_1_section:
        with BuildLine():
            CenterArc((FILLET7_R, -FILLET7_R), FILLET7_R, 90, 90)
            Line((0, -FILLET7_R), (0, 0))
            Line((0, 0), (FILLET7_R, 0))
        make_face()
    fillet7_piece_1 = extrude(amount=61.3918, mode=Mode.PRIVATE)
    fillet7_piece_1 = split(fillet7_piece_1, bisect_by=Plane(origin=(28.09875, 20.184025088, 19.505815531), z_dir=(1, 0, 0)), keep=Keep.TOP, mode=Mode.PRIVATE)
    fillet7_piece_1 = split(fillet7_piece_1, bisect_by=Plane(origin=(28.342705509, 14.907175088, 19.505815531), z_dir=(0, 1, 0)), keep=Keep.TOP, mode=Mode.PRIVATE)
    add(fillet7_piece_1, mode=Mode.SUBTRACT)
    with BuildSketch(Plane(origin=(28.4734, 25.460875088, 20.678533739), x_dir=(0, 0, -1), z_dir=(0, -1, 0))) as fillet7_piece_2_section:
        with BuildLine():
            CenterArc((FILLET7_R, -FILLET7_R), FILLET7_R, 90, 90)
            Line((0, -FILLET7_R), (0, 0))
            Line((0, 0), (FILLET7_R, 0))
        make_face()
    fillet7_piece_2 = extrude(amount=61.3918, mode=Mode.PRIVATE)
    fillet7_piece_2 = split(fillet7_piece_2, bisect_by=Plane(origin=(28.09875, 20.184025088, 20.268453676), z_dir=(-1, 0, 0)), keep=Keep.TOP, mode=Mode.PRIVATE)
    fillet7_piece_2 = split(fillet7_piece_2, bisect_by=Plane(origin=(27.354598965, 14.907175088, 20.268453676), z_dir=(0, 1, 0)), keep=Keep.TOP, mode=Mode.PRIVATE)
    add(fillet7_piece_2, mode=Mode.SUBTRACT)
    with BuildSketch(Plane(origin=(28.4734, 25.460875088, 20.678533739), x_dir=(0, 0, -1), z_dir=(0, -1, 0))) as fillet7_piece_3_section:
        with BuildLine():
            CenterArc((FILLET7_R, -FILLET7_R), FILLET7_R, 90, 90)
            Line((0, -FILLET7_R), (0, 0))
            Line((0, 0), (FILLET7_R, 0))
        make_face()
    fillet7_piece_3 = extrude(amount=61.3918, mode=Mode.PRIVATE)
    fillet7_piece_3 = split(fillet7_piece_3, bisect_by=Plane(origin=(28.09875, 12.906925088, 19.505815531), z_dir=(1, 0, 0)), keep=Keep.TOP, mode=Mode.PRIVATE)
    fillet7_piece_3 = split(fillet7_piece_3, bisect_by=Plane(origin=(28.342705509, 14.907175088, 19.505815531), z_dir=(0, -1, 0)), keep=Keep.TOP, mode=Mode.PRIVATE)
    fillet7_piece_3 = split(fillet7_piece_3, bisect_by=Plane(origin=(28.342705509, 10.906675088, 19.505815531), z_dir=(0, 1, 0)), keep=Keep.TOP, mode=Mode.PRIVATE)
    add(fillet7_piece_3, mode=Mode.SUBTRACT)
    with BuildSketch(Plane(origin=(28.4734, 25.460875088, 20.678533739), x_dir=(0, 0, -1), z_dir=(0, -1, 0))) as fillet7_piece_4_section:
        with BuildLine():
            CenterArc((FILLET7_R, -FILLET7_R), FILLET7_R, 90, 90)
            Line((0, -FILLET7_R), (0, 0))
            Line((0, 0), (FILLET7_R, 0))
        make_face()
    fillet7_piece_4 = extrude(amount=61.3918, mode=Mode.PRIVATE)
    fillet7_piece_4 = split(fillet7_piece_4, bisect_by=Plane(origin=(28.09875, -12.512124912, 19.505815531), z_dir=(1, 0, 0)), keep=Keep.TOP, mode=Mode.PRIVATE)
    fillet7_piece_4 = split(fillet7_piece_4, bisect_by=Plane(origin=(28.342705509, 10.906675088, 19.505815531), z_dir=(0, -1, 0)), keep=Keep.TOP, mode=Mode.PRIVATE)
    add(fillet7_piece_4, mode=Mode.SUBTRACT)
    with BuildSketch(Plane(origin=(28.4734, 25.460875088, 20.678533739), x_dir=(0, 0, -1), z_dir=(0, -1, 0))) as fillet7_piece_5_section:
        with BuildLine():
            CenterArc((FILLET7_R, -FILLET7_R), FILLET7_R, 90, 90)
            Line((0, -FILLET7_R), (0, 0))
            Line((0, 0), (FILLET7_R, 0))
        make_face()
    fillet7_piece_5 = extrude(amount=61.3918, mode=Mode.PRIVATE)
    fillet7_piece_5 = split(fillet7_piece_5, bisect_by=Plane(origin=(28.09875, -12.512124912, 20.268453676), z_dir=(-1, 0, 0)), keep=Keep.TOP, mode=Mode.PRIVATE)
    fillet7_piece_5 = split(fillet7_piece_5, bisect_by=Plane(origin=(27.354598965, 10.906675088, 20.268453676), z_dir=(0, -1, 0)), keep=Keep.TOP, mode=Mode.PRIVATE)
    add(fillet7_piece_5, mode=Mode.SUBTRACT)

    # Fillet8
    # the kernel refuses this fillet: 3.175 mm, written as the material it takes off along each edge
    with BuildSketch(Plane(origin=(0, 25.460875088, 20.678533739), x_dir=(1, 0, 0), z_dir=(0, -1, 0))) as fillet8_piece_1_section:
        with BuildLine():
            CenterArc((FILLET8_R, -FILLET8_R), FILLET8_R, 90, 90)
            Line((0, -FILLET8_R), (0, 0))
            Line((0, 0), (FILLET8_R, 0))
        make_face()
    fillet8_piece_1 = extrude(amount=61.3918, mode=Mode.PRIVATE)
    fillet8_piece_1 = split(fillet8_piece_1, bisect_by=Plane(origin=(1.118801035, 14.907175088, 20.268453676), z_dir=(0, 1, 0)), keep=Keep.TOP, mode=Mode.PRIVATE)
    fillet8_piece_1 = split(fillet8_piece_1, bisect_by=Plane(origin=(0.37465, 20.184025088, 20.268453676), z_dir=(1, 0, 0)), keep=Keep.TOP, mode=Mode.PRIVATE)
    add(fillet8_piece_1, mode=Mode.SUBTRACT)
    with BuildSketch(Plane(origin=(0, 25.460875088, 20.678533739), x_dir=(1, 0, 0), z_dir=(0, -1, 0))) as fillet8_piece_2_section:
        with BuildLine():
            CenterArc((FILLET8_R, -FILLET8_R), FILLET8_R, 90, 90)
            Line((0, -FILLET8_R), (0, 0))
            Line((0, 0), (FILLET8_R, 0))
        make_face()
    fillet8_piece_2 = extrude(amount=61.3918, mode=Mode.PRIVATE)
    fillet8_piece_2 = split(fillet8_piece_2, bisect_by=Plane(origin=(0.130694491, 14.907175088, 19.505815531), z_dir=(0, 1, 0)), keep=Keep.TOP, mode=Mode.PRIVATE)
    fillet8_piece_2 = split(fillet8_piece_2, bisect_by=Plane(origin=(0.37465, 20.184025088, 19.505815531), z_dir=(-1, 0, 0)), keep=Keep.TOP, mode=Mode.PRIVATE)
    add(fillet8_piece_2, mode=Mode.SUBTRACT)
    with BuildSketch(Plane(origin=(0, 25.460875088, 20.678533739), x_dir=(1, 0, 0), z_dir=(0, -1, 0))) as fillet8_piece_3_section:
        with BuildLine():
            CenterArc((FILLET8_R, -FILLET8_R), FILLET8_R, 90, 90)
            Line((0, -FILLET8_R), (0, 0))
            Line((0, 0), (FILLET8_R, 0))
        make_face()
    fillet8_piece_3 = extrude(amount=61.3918, mode=Mode.PRIVATE)
    fillet8_piece_3 = split(fillet8_piece_3, bisect_by=Plane(origin=(0.130694491, 14.907175088, 19.505815531), z_dir=(0, -1, 0)), keep=Keep.TOP, mode=Mode.PRIVATE)
    fillet8_piece_3 = split(fillet8_piece_3, bisect_by=Plane(origin=(0.37465, 12.906925088, 19.505815531), z_dir=(-1, 0, 0)), keep=Keep.TOP, mode=Mode.PRIVATE)
    fillet8_piece_3 = split(fillet8_piece_3, bisect_by=Plane(origin=(0.130694491, 10.906675088, 19.505815531), z_dir=(0, 1, 0)), keep=Keep.TOP, mode=Mode.PRIVATE)
    add(fillet8_piece_3, mode=Mode.SUBTRACT)
    with BuildSketch(Plane(origin=(0, 25.460875088, 20.678533739), x_dir=(1, 0, 0), z_dir=(0, -1, 0))) as fillet8_piece_4_section:
        with BuildLine():
            CenterArc((FILLET8_R, -FILLET8_R), FILLET8_R, 90, 90)
            Line((0, -FILLET8_R), (0, 0))
            Line((0, 0), (FILLET8_R, 0))
        make_face()
    fillet8_piece_4 = extrude(amount=61.3918, mode=Mode.PRIVATE)
    fillet8_piece_4 = split(fillet8_piece_4, bisect_by=Plane(origin=(0.37465, -12.512124912, 20.268453676), z_dir=(1, 0, 0)), keep=Keep.TOP, mode=Mode.PRIVATE)
    fillet8_piece_4 = split(fillet8_piece_4, bisect_by=Plane(origin=(1.118801035, 10.906675088, 20.268453676), z_dir=(0, -1, 0)), keep=Keep.TOP, mode=Mode.PRIVATE)
    add(fillet8_piece_4, mode=Mode.SUBTRACT)
    with BuildSketch(Plane(origin=(0, 25.460875088, 20.678533739), x_dir=(1, 0, 0), z_dir=(0, -1, 0))) as fillet8_piece_5_section:
        with BuildLine():
            CenterArc((FILLET8_R, -FILLET8_R), FILLET8_R, 90, 90)
            Line((0, -FILLET8_R), (0, 0))
            Line((0, 0), (FILLET8_R, 0))
        make_face()
    fillet8_piece_5 = extrude(amount=61.3918, mode=Mode.PRIVATE)
    fillet8_piece_5 = split(fillet8_piece_5, bisect_by=Plane(origin=(0.37465, -12.512124912, 19.505815531), z_dir=(-1, 0, 0)), keep=Keep.TOP, mode=Mode.PRIVATE)
    fillet8_piece_5 = split(fillet8_piece_5, bisect_by=Plane(origin=(0.130694491, 10.906675088, 19.505815531), z_dir=(0, -1, 0)), keep=Keep.TOP, mode=Mode.PRIVATE)
    add(fillet8_piece_5, mode=Mode.SUBTRACT)

    # Fillet9
    fillet9_edges = [part.edges().sort_by_distance(p)[0] for p in [
        (0.37465, 12.906925088, -45.564666261),
    ]]
    fillet(fillet9_edges, radius=FILLET9_R)

    # Fillet10
    fillet10_edges = [part.edges().sort_by_distance(p)[0] for p in [
        (28.09875, 12.906925088, -45.564666261),
    ]]
    fillet(fillet10_edges, radius=FILLET10_R)

    # Fillet11
    fillet11_edges = [part.edges().sort_by_distance(p)[0] for p in [
        (26.48585, 21.219075088, 7.946783739),
    ]]
    fillet(fillet11_edges, radius=FILLET11_R)

    # Fillet12
    fillet12_edges = [part.edges().sort_by_distance(p)[0] for p in [
        (28.09875, 12.906925088, 28.273133739),
    ]]
    fillet(fillet12_edges, radius=FILLET12_R)

    # Mirror1: Cut-Extrude1, Cut-Extrude2, Boss-Extrude6, Cut-Revolve1, Cut-Revolve2 across plane
    add(cut_extrude1.mirror(Plane.XY.offset(-8.645766261)), mode=Mode.SUBTRACT)
    add(cut_extrude2.mirror(Plane.XY.offset(-8.645766261)), mode=Mode.SUBTRACT)
    add(boss_extrude6.mirror(Plane.XY.offset(-8.645766261)))
    add(cut_revolve1.mirror(Plane.XY.offset(-8.645766261)), mode=Mode.SUBTRACT)
    add(cut_revolve2.mirror(Plane.XY.offset(-8.645766261)), mode=Mode.SUBTRACT)


solid = part.part
